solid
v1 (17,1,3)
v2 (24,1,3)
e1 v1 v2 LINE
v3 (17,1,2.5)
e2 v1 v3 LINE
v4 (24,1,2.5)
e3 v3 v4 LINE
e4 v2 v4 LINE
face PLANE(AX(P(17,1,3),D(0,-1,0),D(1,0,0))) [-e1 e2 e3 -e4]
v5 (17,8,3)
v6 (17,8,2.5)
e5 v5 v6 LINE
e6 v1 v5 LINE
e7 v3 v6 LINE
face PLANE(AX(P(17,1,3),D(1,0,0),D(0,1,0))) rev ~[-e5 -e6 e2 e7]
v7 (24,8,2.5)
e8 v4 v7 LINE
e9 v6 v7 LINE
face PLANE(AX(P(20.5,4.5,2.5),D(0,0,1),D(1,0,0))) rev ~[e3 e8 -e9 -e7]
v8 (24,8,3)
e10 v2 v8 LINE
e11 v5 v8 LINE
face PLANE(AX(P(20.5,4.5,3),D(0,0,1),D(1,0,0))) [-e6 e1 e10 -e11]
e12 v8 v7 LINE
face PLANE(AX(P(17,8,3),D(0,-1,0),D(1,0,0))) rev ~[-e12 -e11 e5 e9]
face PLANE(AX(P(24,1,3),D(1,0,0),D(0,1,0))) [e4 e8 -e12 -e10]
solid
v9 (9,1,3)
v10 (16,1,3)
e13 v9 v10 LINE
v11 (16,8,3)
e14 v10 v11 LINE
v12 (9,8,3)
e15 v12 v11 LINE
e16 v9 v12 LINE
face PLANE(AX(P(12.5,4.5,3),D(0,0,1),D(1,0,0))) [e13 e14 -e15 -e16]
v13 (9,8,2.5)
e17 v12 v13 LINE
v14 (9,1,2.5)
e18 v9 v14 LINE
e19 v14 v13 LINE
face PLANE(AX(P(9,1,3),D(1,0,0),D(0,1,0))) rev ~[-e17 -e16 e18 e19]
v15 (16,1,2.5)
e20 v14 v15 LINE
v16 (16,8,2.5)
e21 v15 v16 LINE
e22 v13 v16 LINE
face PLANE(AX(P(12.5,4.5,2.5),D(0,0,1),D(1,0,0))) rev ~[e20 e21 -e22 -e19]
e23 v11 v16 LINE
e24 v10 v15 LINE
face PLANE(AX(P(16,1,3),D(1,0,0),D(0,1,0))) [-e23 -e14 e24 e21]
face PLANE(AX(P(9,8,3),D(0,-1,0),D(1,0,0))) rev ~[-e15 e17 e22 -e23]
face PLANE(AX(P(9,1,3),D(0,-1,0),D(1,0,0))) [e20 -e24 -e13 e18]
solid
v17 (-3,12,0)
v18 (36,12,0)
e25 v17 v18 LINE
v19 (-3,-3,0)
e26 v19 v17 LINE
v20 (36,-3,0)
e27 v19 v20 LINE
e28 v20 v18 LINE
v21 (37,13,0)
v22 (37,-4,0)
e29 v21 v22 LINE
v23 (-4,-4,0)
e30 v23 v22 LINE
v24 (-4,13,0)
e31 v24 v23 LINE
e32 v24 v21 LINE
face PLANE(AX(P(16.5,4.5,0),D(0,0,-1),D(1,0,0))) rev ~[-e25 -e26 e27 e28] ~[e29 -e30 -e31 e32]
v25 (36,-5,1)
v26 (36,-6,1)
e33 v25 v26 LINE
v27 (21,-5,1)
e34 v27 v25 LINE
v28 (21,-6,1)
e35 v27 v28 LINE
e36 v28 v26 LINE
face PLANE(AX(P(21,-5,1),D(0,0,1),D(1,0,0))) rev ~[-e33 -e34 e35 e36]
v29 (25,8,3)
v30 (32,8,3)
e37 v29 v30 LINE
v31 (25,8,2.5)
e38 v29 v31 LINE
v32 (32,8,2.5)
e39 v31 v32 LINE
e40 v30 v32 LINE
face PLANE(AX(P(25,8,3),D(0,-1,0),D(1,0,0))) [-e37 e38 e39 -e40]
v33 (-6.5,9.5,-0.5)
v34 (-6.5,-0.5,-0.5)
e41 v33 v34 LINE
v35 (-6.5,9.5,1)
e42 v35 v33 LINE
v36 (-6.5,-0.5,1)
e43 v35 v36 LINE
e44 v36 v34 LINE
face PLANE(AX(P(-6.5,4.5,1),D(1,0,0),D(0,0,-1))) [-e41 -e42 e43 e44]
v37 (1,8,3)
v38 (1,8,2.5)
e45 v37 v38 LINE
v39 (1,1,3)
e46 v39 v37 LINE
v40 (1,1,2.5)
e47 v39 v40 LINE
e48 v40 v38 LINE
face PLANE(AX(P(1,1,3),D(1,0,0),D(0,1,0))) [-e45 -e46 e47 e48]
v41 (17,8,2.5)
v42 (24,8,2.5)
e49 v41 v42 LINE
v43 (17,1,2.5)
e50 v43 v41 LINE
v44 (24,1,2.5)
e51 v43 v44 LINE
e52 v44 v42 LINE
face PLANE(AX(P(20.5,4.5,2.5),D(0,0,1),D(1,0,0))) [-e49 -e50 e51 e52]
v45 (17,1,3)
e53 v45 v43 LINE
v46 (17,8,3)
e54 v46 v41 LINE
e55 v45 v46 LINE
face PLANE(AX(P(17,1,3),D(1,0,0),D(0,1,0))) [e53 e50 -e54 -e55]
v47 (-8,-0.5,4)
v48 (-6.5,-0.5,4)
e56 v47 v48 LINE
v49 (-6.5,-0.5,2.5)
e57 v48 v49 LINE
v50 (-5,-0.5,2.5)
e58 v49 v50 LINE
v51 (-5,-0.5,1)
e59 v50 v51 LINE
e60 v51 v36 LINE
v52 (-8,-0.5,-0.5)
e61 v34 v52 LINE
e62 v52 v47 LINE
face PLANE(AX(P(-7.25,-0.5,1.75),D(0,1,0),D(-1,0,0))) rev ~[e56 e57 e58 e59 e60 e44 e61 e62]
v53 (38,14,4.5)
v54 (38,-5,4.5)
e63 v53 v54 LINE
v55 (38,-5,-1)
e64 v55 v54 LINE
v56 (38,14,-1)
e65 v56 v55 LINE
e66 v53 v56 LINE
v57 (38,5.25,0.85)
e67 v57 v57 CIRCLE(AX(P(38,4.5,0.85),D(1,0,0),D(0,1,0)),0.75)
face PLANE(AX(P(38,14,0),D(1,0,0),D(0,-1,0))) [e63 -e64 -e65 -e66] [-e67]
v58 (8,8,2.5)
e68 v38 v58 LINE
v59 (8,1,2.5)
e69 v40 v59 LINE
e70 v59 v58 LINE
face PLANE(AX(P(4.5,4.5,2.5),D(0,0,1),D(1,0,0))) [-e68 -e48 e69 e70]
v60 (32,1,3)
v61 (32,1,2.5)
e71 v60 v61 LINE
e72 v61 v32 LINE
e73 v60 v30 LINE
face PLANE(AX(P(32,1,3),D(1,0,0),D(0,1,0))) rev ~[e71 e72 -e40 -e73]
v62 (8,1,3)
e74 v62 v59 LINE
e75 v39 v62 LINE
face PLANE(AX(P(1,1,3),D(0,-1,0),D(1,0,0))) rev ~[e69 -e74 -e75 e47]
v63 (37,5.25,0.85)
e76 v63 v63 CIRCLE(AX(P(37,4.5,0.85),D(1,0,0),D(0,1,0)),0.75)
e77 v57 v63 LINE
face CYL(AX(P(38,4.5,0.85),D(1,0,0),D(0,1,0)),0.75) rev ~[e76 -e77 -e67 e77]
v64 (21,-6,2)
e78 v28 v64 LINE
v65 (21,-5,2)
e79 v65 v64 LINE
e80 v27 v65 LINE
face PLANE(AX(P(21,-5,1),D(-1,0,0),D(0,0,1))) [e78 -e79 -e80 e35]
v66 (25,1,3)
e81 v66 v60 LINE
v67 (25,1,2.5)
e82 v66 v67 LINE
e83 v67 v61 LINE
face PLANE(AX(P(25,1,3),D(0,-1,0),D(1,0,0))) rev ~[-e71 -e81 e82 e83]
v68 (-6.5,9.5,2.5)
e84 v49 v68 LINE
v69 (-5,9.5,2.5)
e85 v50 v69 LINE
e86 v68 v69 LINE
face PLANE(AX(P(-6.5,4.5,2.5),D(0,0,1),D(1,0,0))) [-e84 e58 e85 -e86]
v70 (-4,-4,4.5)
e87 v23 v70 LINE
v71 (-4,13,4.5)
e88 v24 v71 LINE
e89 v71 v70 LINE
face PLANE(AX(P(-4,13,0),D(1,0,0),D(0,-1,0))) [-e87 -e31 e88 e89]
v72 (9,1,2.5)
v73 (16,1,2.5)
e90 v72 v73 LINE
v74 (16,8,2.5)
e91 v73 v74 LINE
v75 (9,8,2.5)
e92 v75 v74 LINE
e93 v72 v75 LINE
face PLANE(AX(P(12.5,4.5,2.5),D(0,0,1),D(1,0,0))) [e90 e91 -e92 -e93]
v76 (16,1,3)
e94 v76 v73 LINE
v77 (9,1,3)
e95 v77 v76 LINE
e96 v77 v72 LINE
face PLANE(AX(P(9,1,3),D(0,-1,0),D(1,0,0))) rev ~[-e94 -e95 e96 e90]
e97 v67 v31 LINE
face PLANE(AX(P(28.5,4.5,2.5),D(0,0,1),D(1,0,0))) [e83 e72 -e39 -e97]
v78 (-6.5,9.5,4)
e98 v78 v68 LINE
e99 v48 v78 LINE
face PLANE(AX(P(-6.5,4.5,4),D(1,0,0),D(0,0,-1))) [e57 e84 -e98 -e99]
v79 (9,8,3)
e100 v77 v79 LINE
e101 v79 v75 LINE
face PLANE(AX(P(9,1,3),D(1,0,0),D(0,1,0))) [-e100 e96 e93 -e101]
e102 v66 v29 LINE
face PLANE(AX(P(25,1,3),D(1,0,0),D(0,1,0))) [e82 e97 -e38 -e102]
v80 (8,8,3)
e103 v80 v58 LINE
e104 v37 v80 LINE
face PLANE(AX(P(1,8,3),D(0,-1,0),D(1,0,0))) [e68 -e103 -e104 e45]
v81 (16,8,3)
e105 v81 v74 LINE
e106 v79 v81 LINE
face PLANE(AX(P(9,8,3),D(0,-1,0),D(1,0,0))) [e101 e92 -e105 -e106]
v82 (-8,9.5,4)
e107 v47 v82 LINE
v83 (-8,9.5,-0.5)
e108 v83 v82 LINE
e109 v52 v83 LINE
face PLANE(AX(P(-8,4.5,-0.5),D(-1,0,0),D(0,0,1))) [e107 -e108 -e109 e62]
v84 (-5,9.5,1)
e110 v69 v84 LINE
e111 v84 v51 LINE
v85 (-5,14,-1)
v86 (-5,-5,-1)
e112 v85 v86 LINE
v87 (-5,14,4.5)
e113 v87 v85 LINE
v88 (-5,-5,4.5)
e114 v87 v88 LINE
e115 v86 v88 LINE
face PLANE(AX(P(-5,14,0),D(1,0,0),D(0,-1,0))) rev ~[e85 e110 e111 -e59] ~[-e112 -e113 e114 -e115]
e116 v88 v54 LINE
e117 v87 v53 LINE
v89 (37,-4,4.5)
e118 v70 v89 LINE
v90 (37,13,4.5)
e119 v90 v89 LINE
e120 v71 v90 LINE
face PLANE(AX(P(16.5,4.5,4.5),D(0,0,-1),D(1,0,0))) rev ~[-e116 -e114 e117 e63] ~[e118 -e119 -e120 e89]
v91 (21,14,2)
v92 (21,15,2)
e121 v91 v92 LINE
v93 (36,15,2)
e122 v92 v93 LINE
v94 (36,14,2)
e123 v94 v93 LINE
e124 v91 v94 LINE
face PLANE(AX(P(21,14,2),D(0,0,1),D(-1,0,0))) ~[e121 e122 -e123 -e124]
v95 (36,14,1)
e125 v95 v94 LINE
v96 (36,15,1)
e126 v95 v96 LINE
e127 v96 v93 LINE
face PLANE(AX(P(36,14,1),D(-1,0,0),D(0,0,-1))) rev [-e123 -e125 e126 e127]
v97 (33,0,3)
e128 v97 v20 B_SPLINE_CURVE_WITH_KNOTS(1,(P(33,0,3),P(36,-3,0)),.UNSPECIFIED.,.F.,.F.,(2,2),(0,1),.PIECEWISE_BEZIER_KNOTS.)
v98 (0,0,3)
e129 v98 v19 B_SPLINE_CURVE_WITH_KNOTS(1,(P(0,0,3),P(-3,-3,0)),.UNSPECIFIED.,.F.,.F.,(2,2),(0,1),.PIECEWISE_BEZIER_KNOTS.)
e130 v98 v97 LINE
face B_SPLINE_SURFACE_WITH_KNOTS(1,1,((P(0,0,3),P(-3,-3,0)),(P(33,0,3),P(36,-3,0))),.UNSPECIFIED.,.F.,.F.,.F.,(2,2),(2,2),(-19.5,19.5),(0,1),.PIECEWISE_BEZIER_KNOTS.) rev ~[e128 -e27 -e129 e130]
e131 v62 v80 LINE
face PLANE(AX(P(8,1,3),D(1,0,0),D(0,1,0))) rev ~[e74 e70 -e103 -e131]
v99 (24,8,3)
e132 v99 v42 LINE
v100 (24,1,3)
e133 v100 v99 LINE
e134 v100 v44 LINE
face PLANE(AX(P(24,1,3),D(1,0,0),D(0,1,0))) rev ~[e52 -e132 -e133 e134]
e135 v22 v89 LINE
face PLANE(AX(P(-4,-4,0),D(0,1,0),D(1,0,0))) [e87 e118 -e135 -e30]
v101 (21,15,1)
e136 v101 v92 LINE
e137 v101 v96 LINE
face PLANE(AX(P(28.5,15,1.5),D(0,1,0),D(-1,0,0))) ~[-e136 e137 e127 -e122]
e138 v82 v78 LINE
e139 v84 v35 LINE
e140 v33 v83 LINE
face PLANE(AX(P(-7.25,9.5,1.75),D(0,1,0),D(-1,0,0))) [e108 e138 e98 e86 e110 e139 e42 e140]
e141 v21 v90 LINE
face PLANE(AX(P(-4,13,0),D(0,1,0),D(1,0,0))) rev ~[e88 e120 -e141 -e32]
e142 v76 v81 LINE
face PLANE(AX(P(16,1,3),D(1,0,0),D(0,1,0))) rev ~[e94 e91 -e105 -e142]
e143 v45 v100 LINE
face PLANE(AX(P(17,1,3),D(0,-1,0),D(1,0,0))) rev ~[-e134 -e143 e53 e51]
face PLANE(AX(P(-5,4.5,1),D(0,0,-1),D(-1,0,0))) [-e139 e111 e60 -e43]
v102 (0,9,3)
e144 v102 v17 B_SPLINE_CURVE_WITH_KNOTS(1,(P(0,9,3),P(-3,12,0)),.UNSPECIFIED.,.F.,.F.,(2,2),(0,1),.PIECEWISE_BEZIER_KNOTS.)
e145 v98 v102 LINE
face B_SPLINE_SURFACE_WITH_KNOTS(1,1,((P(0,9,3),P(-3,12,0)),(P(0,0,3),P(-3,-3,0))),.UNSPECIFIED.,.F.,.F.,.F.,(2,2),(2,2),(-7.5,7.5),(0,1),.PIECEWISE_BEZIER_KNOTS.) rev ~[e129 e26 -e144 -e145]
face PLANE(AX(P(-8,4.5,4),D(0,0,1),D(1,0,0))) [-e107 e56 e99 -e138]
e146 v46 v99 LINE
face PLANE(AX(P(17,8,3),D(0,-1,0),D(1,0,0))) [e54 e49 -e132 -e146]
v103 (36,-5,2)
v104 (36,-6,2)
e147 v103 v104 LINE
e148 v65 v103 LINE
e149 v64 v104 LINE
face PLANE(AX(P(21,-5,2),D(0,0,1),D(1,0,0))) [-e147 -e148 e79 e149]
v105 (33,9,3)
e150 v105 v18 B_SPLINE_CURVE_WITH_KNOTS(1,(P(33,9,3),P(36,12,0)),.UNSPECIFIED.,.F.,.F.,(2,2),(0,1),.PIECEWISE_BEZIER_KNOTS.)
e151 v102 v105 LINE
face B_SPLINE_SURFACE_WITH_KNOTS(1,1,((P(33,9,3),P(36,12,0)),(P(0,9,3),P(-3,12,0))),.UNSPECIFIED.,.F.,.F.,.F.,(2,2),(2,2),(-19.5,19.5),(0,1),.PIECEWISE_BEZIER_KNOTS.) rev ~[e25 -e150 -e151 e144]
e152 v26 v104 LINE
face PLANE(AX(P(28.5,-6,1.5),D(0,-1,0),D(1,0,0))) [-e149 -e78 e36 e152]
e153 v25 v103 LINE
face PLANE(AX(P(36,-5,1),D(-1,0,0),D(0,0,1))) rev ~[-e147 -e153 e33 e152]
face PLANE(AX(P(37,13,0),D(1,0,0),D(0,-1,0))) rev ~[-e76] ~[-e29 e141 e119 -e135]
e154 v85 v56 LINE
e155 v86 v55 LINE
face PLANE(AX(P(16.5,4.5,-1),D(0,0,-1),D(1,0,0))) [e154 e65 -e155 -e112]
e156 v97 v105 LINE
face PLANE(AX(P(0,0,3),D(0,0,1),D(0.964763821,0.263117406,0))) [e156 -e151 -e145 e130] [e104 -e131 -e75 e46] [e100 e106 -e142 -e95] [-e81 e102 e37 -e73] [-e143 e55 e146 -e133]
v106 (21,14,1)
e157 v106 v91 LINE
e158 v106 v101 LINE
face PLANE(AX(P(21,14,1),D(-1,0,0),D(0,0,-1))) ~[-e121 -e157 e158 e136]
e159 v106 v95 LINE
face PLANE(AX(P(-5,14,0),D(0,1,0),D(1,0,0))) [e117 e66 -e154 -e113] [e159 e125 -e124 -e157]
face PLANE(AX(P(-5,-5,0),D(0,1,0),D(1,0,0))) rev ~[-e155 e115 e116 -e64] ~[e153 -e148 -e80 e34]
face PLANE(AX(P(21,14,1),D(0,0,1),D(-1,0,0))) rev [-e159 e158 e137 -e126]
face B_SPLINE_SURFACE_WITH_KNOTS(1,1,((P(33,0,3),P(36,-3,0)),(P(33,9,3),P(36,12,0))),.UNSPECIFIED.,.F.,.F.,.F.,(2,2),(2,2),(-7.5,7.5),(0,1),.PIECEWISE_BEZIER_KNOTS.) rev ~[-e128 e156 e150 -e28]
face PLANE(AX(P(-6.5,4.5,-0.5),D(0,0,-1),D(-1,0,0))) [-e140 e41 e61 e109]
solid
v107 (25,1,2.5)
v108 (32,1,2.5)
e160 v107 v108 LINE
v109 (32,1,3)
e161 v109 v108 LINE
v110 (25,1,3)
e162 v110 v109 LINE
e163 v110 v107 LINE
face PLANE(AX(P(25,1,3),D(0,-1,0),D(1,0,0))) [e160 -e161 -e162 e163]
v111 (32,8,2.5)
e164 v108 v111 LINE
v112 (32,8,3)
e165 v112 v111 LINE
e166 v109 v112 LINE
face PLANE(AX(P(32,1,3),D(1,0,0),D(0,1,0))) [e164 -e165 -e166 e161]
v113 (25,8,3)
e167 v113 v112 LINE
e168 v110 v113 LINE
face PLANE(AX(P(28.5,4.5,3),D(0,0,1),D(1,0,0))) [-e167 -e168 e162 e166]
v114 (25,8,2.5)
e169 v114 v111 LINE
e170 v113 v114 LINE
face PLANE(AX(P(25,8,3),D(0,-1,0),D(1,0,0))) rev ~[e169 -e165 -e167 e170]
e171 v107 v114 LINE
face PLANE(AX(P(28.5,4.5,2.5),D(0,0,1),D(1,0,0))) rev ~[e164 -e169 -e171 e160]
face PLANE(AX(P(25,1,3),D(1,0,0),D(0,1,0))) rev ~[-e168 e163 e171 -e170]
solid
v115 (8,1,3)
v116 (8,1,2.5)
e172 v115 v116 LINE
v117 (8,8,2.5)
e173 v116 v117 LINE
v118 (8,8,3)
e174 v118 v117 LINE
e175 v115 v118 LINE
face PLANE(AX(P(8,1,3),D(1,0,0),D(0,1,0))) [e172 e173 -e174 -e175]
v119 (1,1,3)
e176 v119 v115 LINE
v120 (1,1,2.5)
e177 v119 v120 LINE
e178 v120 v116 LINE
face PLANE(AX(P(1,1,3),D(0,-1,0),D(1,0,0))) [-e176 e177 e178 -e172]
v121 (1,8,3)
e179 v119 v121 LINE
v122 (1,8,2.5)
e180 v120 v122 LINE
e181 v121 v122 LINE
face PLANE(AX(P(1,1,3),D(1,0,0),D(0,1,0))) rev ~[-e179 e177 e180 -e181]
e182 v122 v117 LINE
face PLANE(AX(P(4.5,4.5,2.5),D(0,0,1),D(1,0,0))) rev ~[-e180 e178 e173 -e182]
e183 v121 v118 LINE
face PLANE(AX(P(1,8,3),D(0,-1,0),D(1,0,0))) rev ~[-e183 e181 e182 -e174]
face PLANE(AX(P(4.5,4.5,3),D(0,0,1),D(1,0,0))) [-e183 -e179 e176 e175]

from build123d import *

# Parameters (mm, degrees)
F2_W      = 33
F2_H      = 9
F0_W      = 39
F0_H      = 15
F4_W      = 7
F4_H      = 7
F5_DEPTH  = 0.5
F6_DEPTH  = 0.5
F7_W      = 43
F7_H      = 19
F7_W_2    = 41
F7_H_2    = 17
F7_W_3    = 39
F7_H_3    = 15
F8_DEPTH  = 1
F9_DEPTH  = 4.5
F10_R     = 0.75
F11_DEPTH = 1
F12_W     = 15
F12_H     = 1
F13_DEPTH = 1
F18_DEPTH = 5


# Not quite as in the source:
# - a feature of the source that left no trace in its solid (it failed there, or was rolled back) is left out
# - a pattern or mirror of a feature is missing from the dataset's text; its kind, count and spacing are read off the source's solid


with BuildPart() as f3:
    # F2 (on offset) → F3 section 0
    with BuildSketch(Plane.XY.offset(3)):
        with Locations((16.5, 4.5)):
            Rectangle(F2_W, F2_H)
    # F0 (on Top) → F3 section 1
    with BuildSketch(Plane.XY):
        with Locations((16.5, 4.5)):
            Rectangle(F0_W, F0_H)
    loft()

    # F4 (on offset) → F5 (cut)
    with BuildSketch(Plane.XY.offset(3)):
        with Locations((28.5, 4.5)):
            Rectangle(F4_W, F4_H)
        with Locations((20.5, 4.5)):
            Rectangle(F4_W, F4_H)
        with Locations((12.5, 4.5)):
            Rectangle(F4_W, F4_H)
        with Locations((4.5, 4.5)):
            Rectangle(F4_W, F4_H)
    extrude(amount=-F5_DEPTH, mode=Mode.SUBTRACT)

    # F7 (on face) → F8 (join)
    with BuildSketch(Plane(origin=(0, 0, 0), x_dir=(1, 0, 0), z_dir=(0, 0, -1))):
        with Locations((16.5, -4.5)):
            Rectangle(F7_W, F7_H)
        with Locations((16.5, -4.5)):
            Rectangle(F7_W_2, F7_H_2, mode=Mode.SUBTRACT)
        with Locations((16.5, -4.5)):
            Rectangle(F7_W_2, F7_H_2)
        with Locations((16.5, -4.5)):
            Rectangle(F7_W_3, F7_H_3, mode=Mode.SUBTRACT)
        with Locations((16.5, -4.5)):
            Rectangle(F7_W_3, F7_H_3)
    extrude(amount=F8_DEPTH)

    # F7 (on face) → F9 (join)
    with BuildSketch(Plane(origin=(0, 0, 0), x_dir=(1, 0, 0), z_dir=(0, 0, -1))):
        with Locations((16.5, -4.5)):
            Rectangle(F7_W, F7_H)
        with Locations((16.5, -4.5)):
            Rectangle(F7_W_2, F7_H_2, mode=Mode.SUBTRACT)
    extrude(amount=-F9_DEPTH)

    # F10 (on face) → F11 (cut, through all)
    with BuildSketch(Plane.YZ.offset(38)):
        with Locations((4.5, 0.85)):
            Circle(F10_R)
    extrude(amount=-F11_DEPTH, mode=Mode.SUBTRACT)

    # F12 (on face) → F13 (join)
    with BuildSketch(Plane.XZ.offset(5)):
        with Locations((28.5, 1.5)):
            Rectangle(F12_W, F12_H)
    f13 = extrude(amount=F13_DEPTH)

    # F13_copies: F13 across plane
    add(f13.mirror(Plane.ZX.offset(4.5)))

    # F17 (on face) → F18 (join, symmetric)
    with BuildSketch(Plane(origin=(0, 4.5, 0), x_dir=(-1, 0, 0), z_dir=(0, 1, 0))):
        Polygon((6.5, 1.75), (6.5, 1), (6.5, -0.5), (8, -0.5), (8, 4), (6.5, 4), (6.5, 2.5), align=None)
        Polygon((5, 2.5), (5, 1), (6.5, 1), (6.5, 1.75), (6.5, 2.5), align=None)
    extrude(amount=F18_DEPTH, both=True)


with BuildPart() as f6:
    # F4 (on offset) → F6 (new body)
    with BuildSketch(Plane.XY.offset(3)):
        with Locations((4.5, 4.5)):
            Rectangle(F4_W, F4_H)
    extrude(amount=-F6_DEPTH)


with BuildPart() as f6b:
    # F4 (on offset) → F6, piece 2 (new body)
    with BuildSketch(Plane.XY.offset(3)):
        with Locations((12.5, 4.5)):
            Rectangle(F4_W, F4_H)
    extrude(amount=-F6_DEPTH)


with BuildPart() as f6c:
    # F4 (on offset) → F6, piece 3 (new body)
    with BuildSketch(Plane.XY.offset(3)):
        with Locations((20.5, 4.5)):
            Rectangle(F4_W, F4_H)
    extrude(amount=-F6_DEPTH)


with BuildPart() as f6d:
    # F4 (on offset) → F6, piece 4 (new body)
    with BuildSketch(Plane.XY.offset(3)):
        with Locations((28.5, 4.5)):
            Rectangle(F4_W, F4_H)
    extrude(amount=-F6_DEPTH)


solid = Compound([f3.part, f6.part, f6b.part, f6c.part, f6d.part])
